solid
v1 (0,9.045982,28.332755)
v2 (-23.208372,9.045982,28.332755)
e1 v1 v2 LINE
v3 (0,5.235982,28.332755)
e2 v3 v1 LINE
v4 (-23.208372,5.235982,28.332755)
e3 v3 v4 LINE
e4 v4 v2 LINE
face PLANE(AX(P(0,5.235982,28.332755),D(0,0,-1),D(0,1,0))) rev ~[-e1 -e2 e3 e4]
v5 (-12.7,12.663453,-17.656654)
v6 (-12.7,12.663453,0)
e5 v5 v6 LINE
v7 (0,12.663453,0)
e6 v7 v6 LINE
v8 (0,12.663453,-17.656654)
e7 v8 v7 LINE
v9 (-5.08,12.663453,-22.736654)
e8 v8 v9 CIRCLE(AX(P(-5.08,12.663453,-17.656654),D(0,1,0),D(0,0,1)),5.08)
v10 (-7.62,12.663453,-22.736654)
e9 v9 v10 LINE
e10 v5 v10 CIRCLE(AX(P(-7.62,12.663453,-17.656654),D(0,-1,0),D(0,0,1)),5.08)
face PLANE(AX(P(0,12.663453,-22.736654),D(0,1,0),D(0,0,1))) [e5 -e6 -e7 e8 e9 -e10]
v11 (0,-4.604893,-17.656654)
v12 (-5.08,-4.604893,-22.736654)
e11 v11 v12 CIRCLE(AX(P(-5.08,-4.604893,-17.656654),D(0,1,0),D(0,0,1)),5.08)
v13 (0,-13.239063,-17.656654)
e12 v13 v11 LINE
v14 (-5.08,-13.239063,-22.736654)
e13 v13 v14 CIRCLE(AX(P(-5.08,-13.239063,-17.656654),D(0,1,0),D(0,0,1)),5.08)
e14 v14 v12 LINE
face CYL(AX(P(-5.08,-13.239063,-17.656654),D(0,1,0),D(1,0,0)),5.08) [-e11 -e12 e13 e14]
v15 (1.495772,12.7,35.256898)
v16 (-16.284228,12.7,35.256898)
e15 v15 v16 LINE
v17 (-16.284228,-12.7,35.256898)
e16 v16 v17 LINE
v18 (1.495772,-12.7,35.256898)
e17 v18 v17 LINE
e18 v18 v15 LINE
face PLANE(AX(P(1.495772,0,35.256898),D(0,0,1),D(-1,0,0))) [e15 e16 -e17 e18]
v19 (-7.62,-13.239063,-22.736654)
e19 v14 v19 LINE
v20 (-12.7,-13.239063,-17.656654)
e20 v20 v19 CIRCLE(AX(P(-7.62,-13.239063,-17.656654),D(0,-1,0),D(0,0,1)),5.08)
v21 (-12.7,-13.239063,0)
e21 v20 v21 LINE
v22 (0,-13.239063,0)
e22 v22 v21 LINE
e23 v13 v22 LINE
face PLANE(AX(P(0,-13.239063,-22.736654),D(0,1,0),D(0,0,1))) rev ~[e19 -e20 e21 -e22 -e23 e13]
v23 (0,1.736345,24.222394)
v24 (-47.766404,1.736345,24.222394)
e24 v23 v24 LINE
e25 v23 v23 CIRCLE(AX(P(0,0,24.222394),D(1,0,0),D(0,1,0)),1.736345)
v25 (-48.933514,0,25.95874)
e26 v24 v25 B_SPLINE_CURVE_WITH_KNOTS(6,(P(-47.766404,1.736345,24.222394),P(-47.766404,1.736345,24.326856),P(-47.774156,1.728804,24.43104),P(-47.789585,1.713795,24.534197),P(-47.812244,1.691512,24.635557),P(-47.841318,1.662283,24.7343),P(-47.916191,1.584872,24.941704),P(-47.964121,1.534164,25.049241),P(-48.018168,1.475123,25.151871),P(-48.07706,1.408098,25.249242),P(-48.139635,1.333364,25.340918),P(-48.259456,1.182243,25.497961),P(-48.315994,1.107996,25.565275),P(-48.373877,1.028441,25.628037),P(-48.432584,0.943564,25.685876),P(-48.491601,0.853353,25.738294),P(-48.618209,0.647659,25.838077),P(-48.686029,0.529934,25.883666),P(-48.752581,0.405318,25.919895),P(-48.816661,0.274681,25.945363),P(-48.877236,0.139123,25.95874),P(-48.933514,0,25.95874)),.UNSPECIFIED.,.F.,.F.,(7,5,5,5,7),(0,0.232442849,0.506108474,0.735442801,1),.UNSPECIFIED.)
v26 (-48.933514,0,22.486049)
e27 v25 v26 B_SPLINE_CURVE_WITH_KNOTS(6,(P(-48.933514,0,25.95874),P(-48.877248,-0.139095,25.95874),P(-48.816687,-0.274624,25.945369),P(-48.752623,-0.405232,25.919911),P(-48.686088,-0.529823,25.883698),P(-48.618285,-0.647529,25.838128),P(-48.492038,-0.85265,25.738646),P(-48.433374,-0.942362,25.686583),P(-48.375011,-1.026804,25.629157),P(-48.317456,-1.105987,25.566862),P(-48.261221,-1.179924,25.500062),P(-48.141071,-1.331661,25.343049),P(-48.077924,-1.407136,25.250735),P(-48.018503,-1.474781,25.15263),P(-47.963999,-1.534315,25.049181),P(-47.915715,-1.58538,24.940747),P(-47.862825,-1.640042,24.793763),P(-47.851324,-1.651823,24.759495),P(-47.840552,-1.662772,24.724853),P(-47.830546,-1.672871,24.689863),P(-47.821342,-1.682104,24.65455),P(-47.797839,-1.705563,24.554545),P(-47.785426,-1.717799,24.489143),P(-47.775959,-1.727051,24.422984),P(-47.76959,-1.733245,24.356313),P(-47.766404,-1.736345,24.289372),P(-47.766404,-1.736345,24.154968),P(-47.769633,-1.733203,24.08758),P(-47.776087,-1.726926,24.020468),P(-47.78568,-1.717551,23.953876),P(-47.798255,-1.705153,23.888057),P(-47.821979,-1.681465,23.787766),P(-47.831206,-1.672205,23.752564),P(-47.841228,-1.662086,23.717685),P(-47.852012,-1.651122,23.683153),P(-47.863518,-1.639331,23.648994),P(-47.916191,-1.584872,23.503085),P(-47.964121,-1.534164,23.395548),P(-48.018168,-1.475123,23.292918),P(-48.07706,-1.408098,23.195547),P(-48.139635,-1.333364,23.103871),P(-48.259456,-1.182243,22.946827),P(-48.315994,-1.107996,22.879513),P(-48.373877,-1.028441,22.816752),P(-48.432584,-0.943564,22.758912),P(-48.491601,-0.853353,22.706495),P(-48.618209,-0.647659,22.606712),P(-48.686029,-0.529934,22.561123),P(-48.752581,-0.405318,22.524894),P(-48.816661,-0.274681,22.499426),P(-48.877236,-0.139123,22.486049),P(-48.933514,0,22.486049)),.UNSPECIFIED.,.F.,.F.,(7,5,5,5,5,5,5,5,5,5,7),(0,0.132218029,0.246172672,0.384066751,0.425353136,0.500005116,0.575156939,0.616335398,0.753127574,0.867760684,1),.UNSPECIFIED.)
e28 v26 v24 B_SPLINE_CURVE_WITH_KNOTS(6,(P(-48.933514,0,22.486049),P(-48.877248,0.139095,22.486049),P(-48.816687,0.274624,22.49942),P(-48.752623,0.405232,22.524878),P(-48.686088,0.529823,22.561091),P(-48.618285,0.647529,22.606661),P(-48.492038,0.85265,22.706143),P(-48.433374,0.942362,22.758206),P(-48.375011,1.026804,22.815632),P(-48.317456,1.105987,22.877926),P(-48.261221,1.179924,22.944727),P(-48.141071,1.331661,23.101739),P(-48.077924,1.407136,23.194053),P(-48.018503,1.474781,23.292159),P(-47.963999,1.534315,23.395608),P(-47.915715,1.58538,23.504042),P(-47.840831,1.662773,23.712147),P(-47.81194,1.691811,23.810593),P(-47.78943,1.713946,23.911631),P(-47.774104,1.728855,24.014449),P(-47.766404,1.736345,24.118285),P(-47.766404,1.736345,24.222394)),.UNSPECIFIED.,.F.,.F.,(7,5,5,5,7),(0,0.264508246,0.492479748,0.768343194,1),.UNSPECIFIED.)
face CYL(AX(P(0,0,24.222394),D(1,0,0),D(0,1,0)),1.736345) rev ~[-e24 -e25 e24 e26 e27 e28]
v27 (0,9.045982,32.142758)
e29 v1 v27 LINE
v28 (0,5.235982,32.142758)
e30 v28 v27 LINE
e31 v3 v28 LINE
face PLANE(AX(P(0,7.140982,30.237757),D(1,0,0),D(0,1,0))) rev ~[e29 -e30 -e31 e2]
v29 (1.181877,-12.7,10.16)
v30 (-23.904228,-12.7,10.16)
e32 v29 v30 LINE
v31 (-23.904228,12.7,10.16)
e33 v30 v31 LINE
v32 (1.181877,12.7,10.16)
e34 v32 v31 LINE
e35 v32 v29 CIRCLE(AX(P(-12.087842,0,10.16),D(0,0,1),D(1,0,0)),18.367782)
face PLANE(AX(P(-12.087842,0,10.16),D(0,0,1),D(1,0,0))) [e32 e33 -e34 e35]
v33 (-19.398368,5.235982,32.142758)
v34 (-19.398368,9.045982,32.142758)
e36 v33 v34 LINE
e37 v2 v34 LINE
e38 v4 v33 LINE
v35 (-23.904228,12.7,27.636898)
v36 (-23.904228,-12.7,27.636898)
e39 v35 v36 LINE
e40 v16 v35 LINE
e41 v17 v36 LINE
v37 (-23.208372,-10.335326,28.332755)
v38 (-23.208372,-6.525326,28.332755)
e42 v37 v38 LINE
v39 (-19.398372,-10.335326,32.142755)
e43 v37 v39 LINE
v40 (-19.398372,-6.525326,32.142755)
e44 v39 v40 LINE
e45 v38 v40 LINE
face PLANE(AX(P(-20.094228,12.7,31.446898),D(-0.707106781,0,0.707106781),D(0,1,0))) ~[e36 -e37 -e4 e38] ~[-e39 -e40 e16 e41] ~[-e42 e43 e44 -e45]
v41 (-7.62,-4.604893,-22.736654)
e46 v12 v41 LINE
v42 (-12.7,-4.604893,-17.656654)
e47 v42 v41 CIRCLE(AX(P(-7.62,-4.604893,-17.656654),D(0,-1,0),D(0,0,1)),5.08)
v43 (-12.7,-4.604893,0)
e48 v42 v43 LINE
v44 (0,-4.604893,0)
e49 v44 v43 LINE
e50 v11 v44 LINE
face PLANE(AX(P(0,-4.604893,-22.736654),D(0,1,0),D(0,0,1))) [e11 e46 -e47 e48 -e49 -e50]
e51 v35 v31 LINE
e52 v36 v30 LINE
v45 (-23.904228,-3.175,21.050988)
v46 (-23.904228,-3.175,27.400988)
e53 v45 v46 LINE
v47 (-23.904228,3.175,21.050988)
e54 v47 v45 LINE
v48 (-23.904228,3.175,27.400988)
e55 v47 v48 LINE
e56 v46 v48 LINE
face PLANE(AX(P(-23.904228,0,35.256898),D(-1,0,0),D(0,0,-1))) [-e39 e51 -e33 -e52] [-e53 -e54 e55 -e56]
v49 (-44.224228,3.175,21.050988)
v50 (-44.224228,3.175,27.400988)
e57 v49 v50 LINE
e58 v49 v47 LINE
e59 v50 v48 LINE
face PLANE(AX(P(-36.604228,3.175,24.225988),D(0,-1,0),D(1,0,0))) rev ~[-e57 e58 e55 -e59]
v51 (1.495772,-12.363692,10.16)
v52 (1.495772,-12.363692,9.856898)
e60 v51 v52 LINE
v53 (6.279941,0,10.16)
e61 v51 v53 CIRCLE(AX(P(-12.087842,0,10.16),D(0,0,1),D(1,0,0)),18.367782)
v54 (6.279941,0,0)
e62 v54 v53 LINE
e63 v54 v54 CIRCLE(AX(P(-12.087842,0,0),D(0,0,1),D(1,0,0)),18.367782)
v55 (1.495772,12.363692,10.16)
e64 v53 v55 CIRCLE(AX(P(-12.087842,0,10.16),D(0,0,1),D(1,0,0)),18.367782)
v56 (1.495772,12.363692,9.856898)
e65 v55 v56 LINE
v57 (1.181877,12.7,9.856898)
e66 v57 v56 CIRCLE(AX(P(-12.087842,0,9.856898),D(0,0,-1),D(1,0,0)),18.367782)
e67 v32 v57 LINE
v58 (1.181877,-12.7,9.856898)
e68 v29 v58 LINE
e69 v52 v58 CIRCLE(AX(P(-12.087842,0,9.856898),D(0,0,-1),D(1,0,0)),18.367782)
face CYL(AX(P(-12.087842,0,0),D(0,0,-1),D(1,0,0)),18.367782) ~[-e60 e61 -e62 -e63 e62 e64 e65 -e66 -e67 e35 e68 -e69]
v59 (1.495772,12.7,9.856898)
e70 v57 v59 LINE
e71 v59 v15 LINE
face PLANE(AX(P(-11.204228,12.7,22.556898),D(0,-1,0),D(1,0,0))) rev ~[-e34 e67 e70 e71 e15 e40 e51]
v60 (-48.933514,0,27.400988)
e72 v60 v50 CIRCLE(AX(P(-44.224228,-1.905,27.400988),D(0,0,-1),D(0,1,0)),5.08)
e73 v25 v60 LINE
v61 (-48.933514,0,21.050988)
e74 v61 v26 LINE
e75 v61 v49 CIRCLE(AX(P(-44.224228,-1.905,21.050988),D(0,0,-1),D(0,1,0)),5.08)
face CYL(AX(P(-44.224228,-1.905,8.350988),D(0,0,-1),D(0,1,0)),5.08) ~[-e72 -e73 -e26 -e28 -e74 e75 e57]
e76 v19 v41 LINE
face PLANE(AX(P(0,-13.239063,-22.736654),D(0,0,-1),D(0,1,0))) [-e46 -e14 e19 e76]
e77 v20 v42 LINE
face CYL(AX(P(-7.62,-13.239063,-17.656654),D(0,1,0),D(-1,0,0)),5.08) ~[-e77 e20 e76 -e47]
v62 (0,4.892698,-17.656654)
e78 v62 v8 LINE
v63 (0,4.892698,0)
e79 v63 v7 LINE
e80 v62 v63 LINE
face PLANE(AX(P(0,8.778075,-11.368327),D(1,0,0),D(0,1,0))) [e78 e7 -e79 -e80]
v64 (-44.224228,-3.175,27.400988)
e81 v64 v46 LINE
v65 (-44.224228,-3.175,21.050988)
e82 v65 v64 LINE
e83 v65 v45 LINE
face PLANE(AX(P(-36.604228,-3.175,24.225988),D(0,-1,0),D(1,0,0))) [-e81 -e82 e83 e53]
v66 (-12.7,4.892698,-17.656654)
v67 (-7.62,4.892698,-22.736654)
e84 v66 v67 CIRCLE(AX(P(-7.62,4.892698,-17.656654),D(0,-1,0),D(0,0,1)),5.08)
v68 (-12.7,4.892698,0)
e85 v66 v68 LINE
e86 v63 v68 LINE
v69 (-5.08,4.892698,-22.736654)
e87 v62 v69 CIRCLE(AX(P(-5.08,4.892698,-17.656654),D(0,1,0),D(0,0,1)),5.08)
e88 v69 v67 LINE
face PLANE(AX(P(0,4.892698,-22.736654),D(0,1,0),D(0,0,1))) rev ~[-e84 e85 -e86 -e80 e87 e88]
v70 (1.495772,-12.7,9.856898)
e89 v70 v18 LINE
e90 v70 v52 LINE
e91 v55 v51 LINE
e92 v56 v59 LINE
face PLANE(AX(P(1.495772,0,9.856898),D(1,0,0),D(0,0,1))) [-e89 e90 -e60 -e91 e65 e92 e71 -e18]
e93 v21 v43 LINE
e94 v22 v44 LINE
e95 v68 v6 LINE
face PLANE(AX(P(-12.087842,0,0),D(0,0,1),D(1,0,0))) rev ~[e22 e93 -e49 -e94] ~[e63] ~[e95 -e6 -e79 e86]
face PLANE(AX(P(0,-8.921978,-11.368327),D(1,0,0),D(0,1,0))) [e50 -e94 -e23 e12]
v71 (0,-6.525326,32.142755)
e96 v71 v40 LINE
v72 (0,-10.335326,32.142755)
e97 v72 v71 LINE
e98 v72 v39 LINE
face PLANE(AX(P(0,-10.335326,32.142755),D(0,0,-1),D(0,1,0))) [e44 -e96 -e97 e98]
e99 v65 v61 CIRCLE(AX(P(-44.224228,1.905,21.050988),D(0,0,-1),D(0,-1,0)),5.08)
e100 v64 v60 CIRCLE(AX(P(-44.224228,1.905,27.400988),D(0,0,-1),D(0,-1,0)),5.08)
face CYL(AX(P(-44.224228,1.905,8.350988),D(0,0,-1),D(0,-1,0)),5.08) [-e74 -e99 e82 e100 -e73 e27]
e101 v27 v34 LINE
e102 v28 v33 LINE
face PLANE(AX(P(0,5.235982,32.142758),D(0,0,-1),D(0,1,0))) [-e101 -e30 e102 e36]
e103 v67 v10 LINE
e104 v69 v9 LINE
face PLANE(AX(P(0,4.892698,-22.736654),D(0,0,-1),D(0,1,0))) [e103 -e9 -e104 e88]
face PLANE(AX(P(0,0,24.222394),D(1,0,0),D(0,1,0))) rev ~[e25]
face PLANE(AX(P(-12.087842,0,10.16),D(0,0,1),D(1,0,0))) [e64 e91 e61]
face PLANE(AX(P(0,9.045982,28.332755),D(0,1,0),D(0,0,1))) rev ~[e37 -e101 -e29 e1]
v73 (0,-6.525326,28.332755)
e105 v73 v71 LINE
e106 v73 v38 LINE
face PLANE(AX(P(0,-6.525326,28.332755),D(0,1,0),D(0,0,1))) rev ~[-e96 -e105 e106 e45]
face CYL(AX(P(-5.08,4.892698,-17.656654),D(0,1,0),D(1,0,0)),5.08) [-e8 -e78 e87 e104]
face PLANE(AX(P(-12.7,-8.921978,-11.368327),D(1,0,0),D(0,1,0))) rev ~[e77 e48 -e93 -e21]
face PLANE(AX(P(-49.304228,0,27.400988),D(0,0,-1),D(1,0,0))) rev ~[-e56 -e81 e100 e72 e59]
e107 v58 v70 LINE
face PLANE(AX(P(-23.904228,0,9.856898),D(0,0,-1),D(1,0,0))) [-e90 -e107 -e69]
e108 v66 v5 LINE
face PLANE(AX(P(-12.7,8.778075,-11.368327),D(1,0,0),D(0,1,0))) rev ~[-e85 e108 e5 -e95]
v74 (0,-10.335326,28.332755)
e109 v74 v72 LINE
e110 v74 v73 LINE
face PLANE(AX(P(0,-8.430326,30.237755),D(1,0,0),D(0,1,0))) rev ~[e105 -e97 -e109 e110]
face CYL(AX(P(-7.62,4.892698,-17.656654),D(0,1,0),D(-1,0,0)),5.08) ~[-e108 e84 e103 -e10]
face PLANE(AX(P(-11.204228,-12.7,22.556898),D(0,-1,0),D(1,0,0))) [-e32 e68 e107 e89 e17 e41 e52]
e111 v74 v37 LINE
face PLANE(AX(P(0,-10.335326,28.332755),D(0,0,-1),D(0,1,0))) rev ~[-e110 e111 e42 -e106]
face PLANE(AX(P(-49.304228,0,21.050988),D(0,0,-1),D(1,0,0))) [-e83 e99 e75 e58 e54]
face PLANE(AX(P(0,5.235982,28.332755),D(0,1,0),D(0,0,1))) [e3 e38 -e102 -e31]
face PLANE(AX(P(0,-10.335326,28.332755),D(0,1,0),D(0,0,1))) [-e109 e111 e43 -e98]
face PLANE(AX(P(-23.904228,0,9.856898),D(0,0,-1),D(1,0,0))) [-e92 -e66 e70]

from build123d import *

# Parameters (mm, degrees)
F1_DEPTH     = 12.7
F0_W         = 25.4
F0_H         = 6.35
F2_DEPTH     = 3.175
F3_SIZE      = 7.62
F4_R         = 18.3677824361
F5_DEPTH     = 10.16
F6_W         = 8.6341705173
F6_H         = 22.7366536856
F6_W_2       = 7.7707553282
F7_DEPTH     = 12.7
F8_R         = 5.08
F9_R         = 1.736345134
F10_DEPTH    = 177.8
F11_T1_DEPTH = 31.75
F12_W        = 3.81
F12_H        = 3.810003606
F12_H_2      = 3.81
F13_DEPTH    = 25.4


# Not quite as in the source:
# - a fillet or chamfer that OpenCascade refuses, or shapes differently, is made with other operations: its cross-section is extruded or revolved along the edge and cut away or added


with BuildPart() as f1:
    # F0 (on Front) → F1 (new body, symmetric)
    with BuildSketch(Plane.XZ):
        Polygon((1.495771724, 35.256898239), (-23.904228276, 35.256898239), (-23.904228276, 27.4009877652), (-23.904228276, 21.0509877652), (-23.904228276, 9.856898239), (1.495771724, 9.856898239), align=None)
    extrude(amount=F1_DEPTH, both=True)

    # F0 (on Front) → F2 (join, symmetric)
    with BuildSketch(Plane.XZ):
        with Locations((-36.604228276, 24.2259877652)):
            Rectangle(F0_W, F0_H)
    extrude(amount=F2_DEPTH, both=True)

    # F3
    f3_edges = [f1.edges().sort_by_distance(p)[0] for p in [
        (-23.904228, 0, 35.256898),
    ]]
    chamfer(f3_edges, length=F3_SIZE)

    # F4 (on Top) → F5 (join)
    with BuildSketch(Plane.XY):
        with Locations((-12.0878415182, 0)):
            Circle(F4_R)
    extrude(amount=F5_DEPTH)

    # F6 (on Right) → F7 (join)
    with BuildSketch(Plane.YZ):
        with Locations((-8.9219780639, -11.3683268428)):
            Rectangle(F6_W, F6_H)
        with Locations((8.7780752219, -11.3683268428)):
            Rectangle(F6_W_2, F6_H)
    extrude(amount=-F7_DEPTH)

    # F8
    f8_edges = [f1.edges().sort_by_distance(p)[0] for p in [
        (-12.7, 8.778075, -22.736654),
        (-12.7, -8.921978, -22.736654),
        (0, -8.921978, -22.736654),
        (0, 8.778075, -22.736654),
    ]]
    fillet(f8_edges, radius=F8_R)

    # F9 (on Right) → F10 (cut)
    with BuildSketch(Plane.YZ):
        with Locations((0, 24.2223944515)):
            Circle(F9_R)
    extrude(amount=-F10_DEPTH, mode=Mode.SUBTRACT)

    # F11: fillet of radius 5.08 on 2 edges, made by hand

    # F11_s2 → F11_t1 (cut)
    with BuildSketch(Plane.XY.offset(8.3509877652)):
        with BuildLine():
            ThreePointArc((-44.224228276, 3.175), (-47.8163307244, 1.6871024484), (-49.304228276, -1.905))
            Line((-49.304228276, -1.905), (-49.304228276, 3.175))
            Line((-49.304228276, 3.175), (-44.224228276, 3.175))
        make_face()
        with BuildLine():
            ThreePointArc((-44.224228276, -3.175), (-47.8163307244, -1.6871024484), (-49.304228276, 1.905))
            Line((-49.304228276, 1.905), (-49.304228276, -3.175))
            Line((-49.304228276, -3.175), (-44.224228276, -3.175))
        make_face()
    extrude(amount=F11_T1_DEPTH, mode=Mode.SUBTRACT)

    # F12 (on Right) → F13 (cut)
    with BuildSketch(Plane.YZ):
        with Locations((7.1409824217, 30.2377566695)):
            Rectangle(F12_W, F12_H)
        with Locations((-8.4303260025, 30.2377548665)):
            Rectangle(F12_W, F12_H_2)
    extrude(amount=-F13_DEPTH, mode=Mode.SUBTRACT)


solid = f1.part
